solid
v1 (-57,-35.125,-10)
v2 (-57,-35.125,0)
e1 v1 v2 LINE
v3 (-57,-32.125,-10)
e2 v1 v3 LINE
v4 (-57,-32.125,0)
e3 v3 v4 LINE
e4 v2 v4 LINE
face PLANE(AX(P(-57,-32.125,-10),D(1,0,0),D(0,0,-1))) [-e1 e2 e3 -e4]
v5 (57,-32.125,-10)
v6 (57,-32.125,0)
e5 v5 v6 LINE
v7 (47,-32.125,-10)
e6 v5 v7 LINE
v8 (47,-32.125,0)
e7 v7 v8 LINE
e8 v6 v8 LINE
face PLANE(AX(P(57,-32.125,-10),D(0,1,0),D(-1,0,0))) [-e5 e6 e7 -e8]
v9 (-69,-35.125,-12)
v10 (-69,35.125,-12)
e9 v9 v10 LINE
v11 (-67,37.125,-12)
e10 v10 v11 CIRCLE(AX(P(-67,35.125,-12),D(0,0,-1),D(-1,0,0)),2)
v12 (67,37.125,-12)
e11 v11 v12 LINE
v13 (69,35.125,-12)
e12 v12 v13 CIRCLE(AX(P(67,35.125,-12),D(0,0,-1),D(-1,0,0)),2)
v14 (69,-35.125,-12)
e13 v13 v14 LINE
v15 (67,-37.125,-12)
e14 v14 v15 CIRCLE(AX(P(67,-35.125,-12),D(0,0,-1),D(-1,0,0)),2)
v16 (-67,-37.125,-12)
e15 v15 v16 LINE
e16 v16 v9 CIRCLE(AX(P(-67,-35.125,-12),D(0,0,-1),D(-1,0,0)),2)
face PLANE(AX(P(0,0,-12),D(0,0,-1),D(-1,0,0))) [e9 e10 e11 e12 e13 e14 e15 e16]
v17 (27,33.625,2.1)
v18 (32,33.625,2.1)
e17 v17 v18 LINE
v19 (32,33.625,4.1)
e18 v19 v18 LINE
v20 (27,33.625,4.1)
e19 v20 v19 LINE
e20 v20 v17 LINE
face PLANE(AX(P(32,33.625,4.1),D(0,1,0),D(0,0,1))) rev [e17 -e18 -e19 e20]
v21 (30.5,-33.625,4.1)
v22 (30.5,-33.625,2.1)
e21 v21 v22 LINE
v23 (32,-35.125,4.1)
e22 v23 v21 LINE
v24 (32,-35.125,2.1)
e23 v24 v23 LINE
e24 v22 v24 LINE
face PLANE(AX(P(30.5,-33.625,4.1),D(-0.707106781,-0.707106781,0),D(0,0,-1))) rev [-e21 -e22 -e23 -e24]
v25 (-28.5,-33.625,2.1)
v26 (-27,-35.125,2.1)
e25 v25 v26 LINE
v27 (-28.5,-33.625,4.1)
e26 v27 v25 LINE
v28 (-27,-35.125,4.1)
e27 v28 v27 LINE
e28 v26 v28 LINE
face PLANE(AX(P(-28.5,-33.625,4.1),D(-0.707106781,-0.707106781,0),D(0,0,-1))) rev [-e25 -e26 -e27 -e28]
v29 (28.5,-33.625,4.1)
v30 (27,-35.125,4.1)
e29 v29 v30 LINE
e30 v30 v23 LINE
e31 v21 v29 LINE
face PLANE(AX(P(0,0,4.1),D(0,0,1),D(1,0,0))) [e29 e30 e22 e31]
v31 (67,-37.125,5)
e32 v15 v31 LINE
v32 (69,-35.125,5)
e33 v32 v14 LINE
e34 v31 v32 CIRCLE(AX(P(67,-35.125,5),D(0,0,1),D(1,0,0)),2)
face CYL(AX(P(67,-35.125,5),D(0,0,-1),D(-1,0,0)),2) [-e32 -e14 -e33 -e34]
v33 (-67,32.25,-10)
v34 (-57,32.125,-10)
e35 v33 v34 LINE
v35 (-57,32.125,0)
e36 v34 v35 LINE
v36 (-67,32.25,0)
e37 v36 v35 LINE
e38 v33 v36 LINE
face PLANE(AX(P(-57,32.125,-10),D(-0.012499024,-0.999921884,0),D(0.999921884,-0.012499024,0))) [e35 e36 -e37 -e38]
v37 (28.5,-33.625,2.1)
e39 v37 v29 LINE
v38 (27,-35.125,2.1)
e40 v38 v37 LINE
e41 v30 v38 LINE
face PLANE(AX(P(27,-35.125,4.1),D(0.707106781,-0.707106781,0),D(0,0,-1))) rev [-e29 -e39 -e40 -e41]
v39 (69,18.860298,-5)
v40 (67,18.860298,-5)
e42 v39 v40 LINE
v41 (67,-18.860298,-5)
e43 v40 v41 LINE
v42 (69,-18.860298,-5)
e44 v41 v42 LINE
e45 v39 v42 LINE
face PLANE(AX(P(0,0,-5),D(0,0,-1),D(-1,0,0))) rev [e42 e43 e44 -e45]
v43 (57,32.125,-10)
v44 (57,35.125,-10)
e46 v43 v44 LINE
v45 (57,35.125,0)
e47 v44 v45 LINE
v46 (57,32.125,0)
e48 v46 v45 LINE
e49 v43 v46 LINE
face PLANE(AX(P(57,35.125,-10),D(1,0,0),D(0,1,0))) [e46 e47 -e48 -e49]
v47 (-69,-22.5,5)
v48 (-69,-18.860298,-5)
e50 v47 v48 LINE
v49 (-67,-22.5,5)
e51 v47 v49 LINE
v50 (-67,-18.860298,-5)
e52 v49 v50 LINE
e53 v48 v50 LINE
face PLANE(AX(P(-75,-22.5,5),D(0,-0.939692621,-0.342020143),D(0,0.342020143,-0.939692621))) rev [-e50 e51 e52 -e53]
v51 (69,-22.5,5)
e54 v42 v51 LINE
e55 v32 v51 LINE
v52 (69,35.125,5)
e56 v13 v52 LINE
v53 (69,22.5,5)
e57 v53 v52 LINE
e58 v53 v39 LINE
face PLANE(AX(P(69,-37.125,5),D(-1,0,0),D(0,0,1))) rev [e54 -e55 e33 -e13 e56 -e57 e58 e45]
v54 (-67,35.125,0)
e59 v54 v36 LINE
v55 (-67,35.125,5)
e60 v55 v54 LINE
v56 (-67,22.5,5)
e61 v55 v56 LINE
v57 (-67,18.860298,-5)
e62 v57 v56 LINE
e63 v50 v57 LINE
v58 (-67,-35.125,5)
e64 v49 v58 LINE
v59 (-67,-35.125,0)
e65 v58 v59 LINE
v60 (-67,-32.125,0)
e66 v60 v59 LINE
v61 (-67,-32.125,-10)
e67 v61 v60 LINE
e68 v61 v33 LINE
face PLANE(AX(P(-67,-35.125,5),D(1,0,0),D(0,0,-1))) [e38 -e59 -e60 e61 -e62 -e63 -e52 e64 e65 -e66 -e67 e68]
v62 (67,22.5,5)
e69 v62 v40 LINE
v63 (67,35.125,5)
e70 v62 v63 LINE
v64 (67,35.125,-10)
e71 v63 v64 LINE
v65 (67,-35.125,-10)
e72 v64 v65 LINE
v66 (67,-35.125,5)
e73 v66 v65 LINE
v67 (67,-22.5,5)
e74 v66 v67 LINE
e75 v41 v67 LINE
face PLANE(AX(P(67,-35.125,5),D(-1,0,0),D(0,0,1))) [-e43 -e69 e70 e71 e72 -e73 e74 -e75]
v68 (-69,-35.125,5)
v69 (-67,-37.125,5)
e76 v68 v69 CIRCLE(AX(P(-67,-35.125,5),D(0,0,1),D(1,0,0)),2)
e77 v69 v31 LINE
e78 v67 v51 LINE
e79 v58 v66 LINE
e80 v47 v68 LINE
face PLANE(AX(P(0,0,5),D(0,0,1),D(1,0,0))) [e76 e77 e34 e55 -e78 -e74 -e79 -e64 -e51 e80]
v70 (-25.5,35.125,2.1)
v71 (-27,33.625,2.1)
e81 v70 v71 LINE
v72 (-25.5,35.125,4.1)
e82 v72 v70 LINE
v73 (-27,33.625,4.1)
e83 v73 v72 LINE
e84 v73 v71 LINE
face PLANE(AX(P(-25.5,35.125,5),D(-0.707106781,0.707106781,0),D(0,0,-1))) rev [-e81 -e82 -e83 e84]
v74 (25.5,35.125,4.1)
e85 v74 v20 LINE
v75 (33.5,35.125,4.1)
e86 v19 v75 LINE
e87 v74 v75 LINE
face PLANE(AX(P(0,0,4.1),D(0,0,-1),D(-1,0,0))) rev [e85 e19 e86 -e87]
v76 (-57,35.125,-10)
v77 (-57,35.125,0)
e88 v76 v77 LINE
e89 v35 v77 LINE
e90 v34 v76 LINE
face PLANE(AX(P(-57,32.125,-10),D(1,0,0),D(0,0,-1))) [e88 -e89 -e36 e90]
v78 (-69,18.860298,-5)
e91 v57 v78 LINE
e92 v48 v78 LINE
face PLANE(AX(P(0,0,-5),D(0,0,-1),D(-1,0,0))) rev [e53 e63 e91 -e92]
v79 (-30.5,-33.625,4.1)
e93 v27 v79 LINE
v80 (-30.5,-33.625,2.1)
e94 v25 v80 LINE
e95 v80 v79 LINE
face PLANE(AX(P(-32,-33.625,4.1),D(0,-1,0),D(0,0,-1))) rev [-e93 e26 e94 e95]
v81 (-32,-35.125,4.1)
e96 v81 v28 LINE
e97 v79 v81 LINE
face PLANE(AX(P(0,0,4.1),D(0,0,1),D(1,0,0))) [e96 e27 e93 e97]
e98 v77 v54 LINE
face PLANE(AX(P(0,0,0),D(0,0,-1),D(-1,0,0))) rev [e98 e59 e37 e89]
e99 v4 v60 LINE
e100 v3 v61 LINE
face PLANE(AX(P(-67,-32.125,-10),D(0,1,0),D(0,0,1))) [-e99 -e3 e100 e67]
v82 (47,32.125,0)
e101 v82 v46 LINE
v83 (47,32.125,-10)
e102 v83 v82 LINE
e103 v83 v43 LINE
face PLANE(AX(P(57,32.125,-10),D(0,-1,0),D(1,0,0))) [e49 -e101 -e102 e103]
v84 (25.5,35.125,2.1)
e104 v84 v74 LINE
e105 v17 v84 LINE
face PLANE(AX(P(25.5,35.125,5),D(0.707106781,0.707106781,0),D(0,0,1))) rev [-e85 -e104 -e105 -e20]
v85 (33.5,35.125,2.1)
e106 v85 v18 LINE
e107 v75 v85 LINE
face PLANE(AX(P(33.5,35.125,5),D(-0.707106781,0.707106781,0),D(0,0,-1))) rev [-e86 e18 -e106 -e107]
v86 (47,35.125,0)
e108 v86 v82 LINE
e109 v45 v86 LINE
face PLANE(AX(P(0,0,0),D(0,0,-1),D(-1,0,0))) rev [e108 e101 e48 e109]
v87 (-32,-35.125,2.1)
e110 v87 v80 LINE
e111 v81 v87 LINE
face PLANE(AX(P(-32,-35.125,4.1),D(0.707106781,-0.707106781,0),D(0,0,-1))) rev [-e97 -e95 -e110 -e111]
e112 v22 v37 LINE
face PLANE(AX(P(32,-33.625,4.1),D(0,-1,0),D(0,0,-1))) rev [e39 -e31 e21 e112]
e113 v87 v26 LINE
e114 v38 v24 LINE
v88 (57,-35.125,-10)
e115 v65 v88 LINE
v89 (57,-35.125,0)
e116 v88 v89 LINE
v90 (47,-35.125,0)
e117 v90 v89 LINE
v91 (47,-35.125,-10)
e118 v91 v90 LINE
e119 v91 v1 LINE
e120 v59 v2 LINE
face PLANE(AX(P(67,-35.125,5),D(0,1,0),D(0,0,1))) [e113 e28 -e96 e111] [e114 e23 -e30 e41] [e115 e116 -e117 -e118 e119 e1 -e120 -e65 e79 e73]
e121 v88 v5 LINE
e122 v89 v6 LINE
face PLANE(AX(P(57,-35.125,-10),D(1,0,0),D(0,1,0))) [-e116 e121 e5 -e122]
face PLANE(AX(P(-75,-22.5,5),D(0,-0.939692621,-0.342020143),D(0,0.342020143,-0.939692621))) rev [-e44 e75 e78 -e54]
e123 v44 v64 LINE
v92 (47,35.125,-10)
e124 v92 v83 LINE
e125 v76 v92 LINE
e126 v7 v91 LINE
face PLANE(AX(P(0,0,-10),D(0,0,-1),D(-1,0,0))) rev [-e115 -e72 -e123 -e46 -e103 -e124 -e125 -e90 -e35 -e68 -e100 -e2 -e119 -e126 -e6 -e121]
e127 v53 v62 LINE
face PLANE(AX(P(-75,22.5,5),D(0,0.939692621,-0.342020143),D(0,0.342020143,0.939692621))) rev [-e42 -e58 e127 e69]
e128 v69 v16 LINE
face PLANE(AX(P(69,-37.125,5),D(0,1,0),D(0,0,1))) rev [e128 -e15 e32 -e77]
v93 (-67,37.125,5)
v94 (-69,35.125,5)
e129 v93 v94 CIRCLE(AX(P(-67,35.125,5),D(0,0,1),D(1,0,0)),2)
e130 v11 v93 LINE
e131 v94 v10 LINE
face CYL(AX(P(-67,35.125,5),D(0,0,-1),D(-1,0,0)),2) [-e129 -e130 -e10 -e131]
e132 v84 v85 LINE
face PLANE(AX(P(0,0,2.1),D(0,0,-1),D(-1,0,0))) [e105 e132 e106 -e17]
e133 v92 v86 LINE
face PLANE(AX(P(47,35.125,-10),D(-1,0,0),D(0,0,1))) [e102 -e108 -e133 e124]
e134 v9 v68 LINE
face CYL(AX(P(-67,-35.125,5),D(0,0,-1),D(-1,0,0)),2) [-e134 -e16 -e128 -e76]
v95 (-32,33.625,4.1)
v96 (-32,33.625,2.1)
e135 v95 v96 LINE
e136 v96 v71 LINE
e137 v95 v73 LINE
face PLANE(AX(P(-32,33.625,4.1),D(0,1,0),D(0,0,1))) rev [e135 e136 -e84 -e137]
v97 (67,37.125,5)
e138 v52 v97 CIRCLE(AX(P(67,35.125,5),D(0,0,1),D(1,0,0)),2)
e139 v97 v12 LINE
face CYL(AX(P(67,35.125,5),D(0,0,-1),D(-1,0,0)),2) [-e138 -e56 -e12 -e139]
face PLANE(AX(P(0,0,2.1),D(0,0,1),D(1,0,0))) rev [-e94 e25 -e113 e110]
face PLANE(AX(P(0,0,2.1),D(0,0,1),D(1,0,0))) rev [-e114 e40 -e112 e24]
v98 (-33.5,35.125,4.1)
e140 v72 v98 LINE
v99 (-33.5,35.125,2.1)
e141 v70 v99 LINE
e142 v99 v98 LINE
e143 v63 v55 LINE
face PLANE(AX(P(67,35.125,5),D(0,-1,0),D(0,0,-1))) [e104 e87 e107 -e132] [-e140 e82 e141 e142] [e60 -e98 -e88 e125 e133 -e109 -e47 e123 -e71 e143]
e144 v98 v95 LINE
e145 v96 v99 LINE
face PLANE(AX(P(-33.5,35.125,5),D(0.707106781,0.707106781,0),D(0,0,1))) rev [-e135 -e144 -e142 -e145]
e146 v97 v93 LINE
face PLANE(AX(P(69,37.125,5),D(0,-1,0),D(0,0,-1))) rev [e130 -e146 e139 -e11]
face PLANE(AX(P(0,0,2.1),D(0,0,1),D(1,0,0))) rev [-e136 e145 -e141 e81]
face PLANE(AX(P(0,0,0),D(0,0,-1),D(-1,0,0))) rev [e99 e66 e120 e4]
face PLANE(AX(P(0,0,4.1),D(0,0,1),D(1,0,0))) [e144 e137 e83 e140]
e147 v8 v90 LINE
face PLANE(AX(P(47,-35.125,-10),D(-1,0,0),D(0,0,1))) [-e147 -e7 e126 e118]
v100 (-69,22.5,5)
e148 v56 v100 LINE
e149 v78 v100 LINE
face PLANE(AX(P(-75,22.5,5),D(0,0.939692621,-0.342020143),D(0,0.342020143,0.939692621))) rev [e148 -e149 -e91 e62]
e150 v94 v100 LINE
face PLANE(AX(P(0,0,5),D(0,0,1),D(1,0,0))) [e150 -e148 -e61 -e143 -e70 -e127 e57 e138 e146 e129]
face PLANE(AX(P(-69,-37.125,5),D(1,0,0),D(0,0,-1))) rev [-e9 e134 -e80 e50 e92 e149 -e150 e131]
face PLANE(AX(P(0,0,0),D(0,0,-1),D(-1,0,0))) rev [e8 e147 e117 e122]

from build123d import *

# Parameters (mm, degrees)
SKETCH1_W                            = 74.25
SKETCH1_H                            = 138
SKETCH1_W_2                          = 70.25
SKETCH1_H_2                          = 134
BOSS_EXTRUDE1_BOARD_4MM_DEPTH        = 5
SKETCH2_W                            = 138
SKETCH2_H                            = 74.25
BOSS_EXTRUDE2_UNDER_10MS_DEPTH       = 10
SKETCH3_W                            = 138
SKETCH3_H                            = 74.25
BOSS_EXTRUDE3_BOTTOM_COVER_2MM_DEPTH = 2
SKETCH4_W                            = 5
SKETCH4_H                            = 3.5
BOSS_EXTRUDE4_4PINS_DEPTH            = 2
SKETCH5_W                            = 150
SKETCH5_H                            = 45
CUT_EXTRUDE1_CUT_USB_DEPTH           = 10
CUT_EXTRUDE1_CUT_USB_DRAFT           = -20
FILLET1_R                            = 2
CHAMFER2_START                       = 2.1
CHAMFER2_DEPTH                       = 2
CHAMFER2_2_DEPTH                     = 2


with BuildPart() as part:
    # Sketch1 → Boss-Extrude1-board-4mm (new body)
    with BuildSketch(Plane(origin=(0, 0, 0), x_dir=(0, 1, 0), z_dir=(0, 0, 1))):
        Rectangle(SKETCH1_W, SKETCH1_H)
        Rectangle(SKETCH1_W_2, SKETCH1_H_2, mode=Mode.SUBTRACT)
    extrude(amount=BOSS_EXTRUDE1_BOARD_4MM_DEPTH)

    # Sketch2 → Boss-Extrude2-under-10ms (add)
    with BuildSketch(Plane(origin=(0, 0, 0), x_dir=(1, 0, 0), z_dir=(0, 0, -1))):
        Rectangle(SKETCH2_W, SKETCH2_H)
        Polygon((-67, 32.125), (-57, 32.125), (-57, 35.125), (47, 35.125), (47, 32.125), (57, 32.125), (57, 35.125), (67, 35.125), (67, -35.125), (57, -35.125), (57, -32.125), (47, -32.125), (47, -35.125), (-57, -35.125), (-57, -32.125), (-67, -32.25), align=None, mode=Mode.SUBTRACT)
    extrude(amount=BOSS_EXTRUDE2_UNDER_10MS_DEPTH)

    # Sketch3 → Boss-Extrude3-bottom-cover-2mm (add)
    with BuildSketch(Plane(origin=(0, 0, -10), x_dir=(1, 0, 0), z_dir=(0, 0, -1))):
        Rectangle(SKETCH3_W, SKETCH3_H)
    extrude(amount=BOSS_EXTRUDE3_BOTTOM_COVER_2MM_DEPTH)

    # Sketch4 → Boss-Extrude4-4pins (add)
    with BuildSketch(Plane.XY.offset(2.1)):
        with Locations((-29.5, 35.375)):
            Rectangle(SKETCH4_W, SKETCH4_H)
        with Locations((-29.5, -35.375)):
            Rectangle(SKETCH4_W, SKETCH4_H)
        with Locations((29.5, -35.375)):
            Rectangle(SKETCH4_W, SKETCH4_H)
        with Locations((29.5, 35.375)):
            Rectangle(SKETCH4_W, SKETCH4_H)
    extrude(amount=BOSS_EXTRUDE4_4PINS_DEPTH)


with BuildPart() as cut_extrude1_cut_usb_tool:
    # Sketch5 → Cut-Extrude1-cut-usb (with draft: the straight prism first)
    with BuildSketch(Plane.XY.offset(5)):
        Rectangle(SKETCH5_W, SKETCH5_H)
    extrude(amount=-CUT_EXTRUDE1_CUT_USB_DEPTH)
    # Cut-Extrude1-cut-usb: the draft: its side faces are tilted about the plane it starts from
    cut_extrude1_cut_usb_sides = [cut_extrude1_cut_usb_tool.faces().sort_by_distance(p)[0] for p in [
        (0, -22.5, 0),
        (75, 0, 0),
        (0, 22.5, 0),
        (-75, 0, 0),
    ]]
    draft(cut_extrude1_cut_usb_sides, Plane.XY.offset(5), CUT_EXTRUDE1_CUT_USB_DRAFT)


with BuildPart() as part_1:
    add(part.part)

    # Cut-Extrude1-cut-usb: cut by cut_extrude1_cut_usb_tool
    add(cut_extrude1_cut_usb_tool.part, mode=Mode.SUBTRACT)

    # Fillet1
    fillet1_edges = [part_1.edges().sort_by_distance(p)[0] for p in [
        (69, -37.125, -3.5),
        (-69, -37.125, -3.5),
        (-69, 37.125, -3.5),
        (69, 37.125, -3.5),
    ]]
    fillet(fillet1_edges, radius=FILLET1_R)

    # Chamfer2: read off the stored shape, not the designer's step
    # Chamfer2 outline → Chamfer2 (cut)
    with BuildSketch(Plane.XY.offset(CHAMFER2_START)):
        Polygon((-32, -33.625), (-32, -35.125), (-30.5, -33.625), align=None)
        Polygon((-27, -33.625), (-28.5, -33.625), (-27, -35.125), align=None)
        Polygon((27, -33.625), (27, -35.125), (28.5, -33.625), align=None)
        Polygon((32, -33.625), (30.5, -33.625), (32, -35.125), align=None)
    extrude(amount=CHAMFER2_DEPTH, mode=Mode.SUBTRACT)

    # Chamfer2 2 outline → Chamfer2 2 (add)
    with BuildSketch(Plane.XY.offset(CHAMFER2_START)):
        Polygon((-32, 33.625), (-32, 35.125), (-33.5, 35.125), align=None)
        Polygon((-27, 33.625), (-25.5, 35.125), (-27, 35.125), align=None)
        Polygon((33.5, 35.125), (32, 35.125), (32, 33.625), align=None)
        Polygon((25.5, 35.125), (27, 33.625), (27, 35.125), align=None)
    extrude(amount=CHAMFER2_2_DEPTH)


solid = part_1.part
